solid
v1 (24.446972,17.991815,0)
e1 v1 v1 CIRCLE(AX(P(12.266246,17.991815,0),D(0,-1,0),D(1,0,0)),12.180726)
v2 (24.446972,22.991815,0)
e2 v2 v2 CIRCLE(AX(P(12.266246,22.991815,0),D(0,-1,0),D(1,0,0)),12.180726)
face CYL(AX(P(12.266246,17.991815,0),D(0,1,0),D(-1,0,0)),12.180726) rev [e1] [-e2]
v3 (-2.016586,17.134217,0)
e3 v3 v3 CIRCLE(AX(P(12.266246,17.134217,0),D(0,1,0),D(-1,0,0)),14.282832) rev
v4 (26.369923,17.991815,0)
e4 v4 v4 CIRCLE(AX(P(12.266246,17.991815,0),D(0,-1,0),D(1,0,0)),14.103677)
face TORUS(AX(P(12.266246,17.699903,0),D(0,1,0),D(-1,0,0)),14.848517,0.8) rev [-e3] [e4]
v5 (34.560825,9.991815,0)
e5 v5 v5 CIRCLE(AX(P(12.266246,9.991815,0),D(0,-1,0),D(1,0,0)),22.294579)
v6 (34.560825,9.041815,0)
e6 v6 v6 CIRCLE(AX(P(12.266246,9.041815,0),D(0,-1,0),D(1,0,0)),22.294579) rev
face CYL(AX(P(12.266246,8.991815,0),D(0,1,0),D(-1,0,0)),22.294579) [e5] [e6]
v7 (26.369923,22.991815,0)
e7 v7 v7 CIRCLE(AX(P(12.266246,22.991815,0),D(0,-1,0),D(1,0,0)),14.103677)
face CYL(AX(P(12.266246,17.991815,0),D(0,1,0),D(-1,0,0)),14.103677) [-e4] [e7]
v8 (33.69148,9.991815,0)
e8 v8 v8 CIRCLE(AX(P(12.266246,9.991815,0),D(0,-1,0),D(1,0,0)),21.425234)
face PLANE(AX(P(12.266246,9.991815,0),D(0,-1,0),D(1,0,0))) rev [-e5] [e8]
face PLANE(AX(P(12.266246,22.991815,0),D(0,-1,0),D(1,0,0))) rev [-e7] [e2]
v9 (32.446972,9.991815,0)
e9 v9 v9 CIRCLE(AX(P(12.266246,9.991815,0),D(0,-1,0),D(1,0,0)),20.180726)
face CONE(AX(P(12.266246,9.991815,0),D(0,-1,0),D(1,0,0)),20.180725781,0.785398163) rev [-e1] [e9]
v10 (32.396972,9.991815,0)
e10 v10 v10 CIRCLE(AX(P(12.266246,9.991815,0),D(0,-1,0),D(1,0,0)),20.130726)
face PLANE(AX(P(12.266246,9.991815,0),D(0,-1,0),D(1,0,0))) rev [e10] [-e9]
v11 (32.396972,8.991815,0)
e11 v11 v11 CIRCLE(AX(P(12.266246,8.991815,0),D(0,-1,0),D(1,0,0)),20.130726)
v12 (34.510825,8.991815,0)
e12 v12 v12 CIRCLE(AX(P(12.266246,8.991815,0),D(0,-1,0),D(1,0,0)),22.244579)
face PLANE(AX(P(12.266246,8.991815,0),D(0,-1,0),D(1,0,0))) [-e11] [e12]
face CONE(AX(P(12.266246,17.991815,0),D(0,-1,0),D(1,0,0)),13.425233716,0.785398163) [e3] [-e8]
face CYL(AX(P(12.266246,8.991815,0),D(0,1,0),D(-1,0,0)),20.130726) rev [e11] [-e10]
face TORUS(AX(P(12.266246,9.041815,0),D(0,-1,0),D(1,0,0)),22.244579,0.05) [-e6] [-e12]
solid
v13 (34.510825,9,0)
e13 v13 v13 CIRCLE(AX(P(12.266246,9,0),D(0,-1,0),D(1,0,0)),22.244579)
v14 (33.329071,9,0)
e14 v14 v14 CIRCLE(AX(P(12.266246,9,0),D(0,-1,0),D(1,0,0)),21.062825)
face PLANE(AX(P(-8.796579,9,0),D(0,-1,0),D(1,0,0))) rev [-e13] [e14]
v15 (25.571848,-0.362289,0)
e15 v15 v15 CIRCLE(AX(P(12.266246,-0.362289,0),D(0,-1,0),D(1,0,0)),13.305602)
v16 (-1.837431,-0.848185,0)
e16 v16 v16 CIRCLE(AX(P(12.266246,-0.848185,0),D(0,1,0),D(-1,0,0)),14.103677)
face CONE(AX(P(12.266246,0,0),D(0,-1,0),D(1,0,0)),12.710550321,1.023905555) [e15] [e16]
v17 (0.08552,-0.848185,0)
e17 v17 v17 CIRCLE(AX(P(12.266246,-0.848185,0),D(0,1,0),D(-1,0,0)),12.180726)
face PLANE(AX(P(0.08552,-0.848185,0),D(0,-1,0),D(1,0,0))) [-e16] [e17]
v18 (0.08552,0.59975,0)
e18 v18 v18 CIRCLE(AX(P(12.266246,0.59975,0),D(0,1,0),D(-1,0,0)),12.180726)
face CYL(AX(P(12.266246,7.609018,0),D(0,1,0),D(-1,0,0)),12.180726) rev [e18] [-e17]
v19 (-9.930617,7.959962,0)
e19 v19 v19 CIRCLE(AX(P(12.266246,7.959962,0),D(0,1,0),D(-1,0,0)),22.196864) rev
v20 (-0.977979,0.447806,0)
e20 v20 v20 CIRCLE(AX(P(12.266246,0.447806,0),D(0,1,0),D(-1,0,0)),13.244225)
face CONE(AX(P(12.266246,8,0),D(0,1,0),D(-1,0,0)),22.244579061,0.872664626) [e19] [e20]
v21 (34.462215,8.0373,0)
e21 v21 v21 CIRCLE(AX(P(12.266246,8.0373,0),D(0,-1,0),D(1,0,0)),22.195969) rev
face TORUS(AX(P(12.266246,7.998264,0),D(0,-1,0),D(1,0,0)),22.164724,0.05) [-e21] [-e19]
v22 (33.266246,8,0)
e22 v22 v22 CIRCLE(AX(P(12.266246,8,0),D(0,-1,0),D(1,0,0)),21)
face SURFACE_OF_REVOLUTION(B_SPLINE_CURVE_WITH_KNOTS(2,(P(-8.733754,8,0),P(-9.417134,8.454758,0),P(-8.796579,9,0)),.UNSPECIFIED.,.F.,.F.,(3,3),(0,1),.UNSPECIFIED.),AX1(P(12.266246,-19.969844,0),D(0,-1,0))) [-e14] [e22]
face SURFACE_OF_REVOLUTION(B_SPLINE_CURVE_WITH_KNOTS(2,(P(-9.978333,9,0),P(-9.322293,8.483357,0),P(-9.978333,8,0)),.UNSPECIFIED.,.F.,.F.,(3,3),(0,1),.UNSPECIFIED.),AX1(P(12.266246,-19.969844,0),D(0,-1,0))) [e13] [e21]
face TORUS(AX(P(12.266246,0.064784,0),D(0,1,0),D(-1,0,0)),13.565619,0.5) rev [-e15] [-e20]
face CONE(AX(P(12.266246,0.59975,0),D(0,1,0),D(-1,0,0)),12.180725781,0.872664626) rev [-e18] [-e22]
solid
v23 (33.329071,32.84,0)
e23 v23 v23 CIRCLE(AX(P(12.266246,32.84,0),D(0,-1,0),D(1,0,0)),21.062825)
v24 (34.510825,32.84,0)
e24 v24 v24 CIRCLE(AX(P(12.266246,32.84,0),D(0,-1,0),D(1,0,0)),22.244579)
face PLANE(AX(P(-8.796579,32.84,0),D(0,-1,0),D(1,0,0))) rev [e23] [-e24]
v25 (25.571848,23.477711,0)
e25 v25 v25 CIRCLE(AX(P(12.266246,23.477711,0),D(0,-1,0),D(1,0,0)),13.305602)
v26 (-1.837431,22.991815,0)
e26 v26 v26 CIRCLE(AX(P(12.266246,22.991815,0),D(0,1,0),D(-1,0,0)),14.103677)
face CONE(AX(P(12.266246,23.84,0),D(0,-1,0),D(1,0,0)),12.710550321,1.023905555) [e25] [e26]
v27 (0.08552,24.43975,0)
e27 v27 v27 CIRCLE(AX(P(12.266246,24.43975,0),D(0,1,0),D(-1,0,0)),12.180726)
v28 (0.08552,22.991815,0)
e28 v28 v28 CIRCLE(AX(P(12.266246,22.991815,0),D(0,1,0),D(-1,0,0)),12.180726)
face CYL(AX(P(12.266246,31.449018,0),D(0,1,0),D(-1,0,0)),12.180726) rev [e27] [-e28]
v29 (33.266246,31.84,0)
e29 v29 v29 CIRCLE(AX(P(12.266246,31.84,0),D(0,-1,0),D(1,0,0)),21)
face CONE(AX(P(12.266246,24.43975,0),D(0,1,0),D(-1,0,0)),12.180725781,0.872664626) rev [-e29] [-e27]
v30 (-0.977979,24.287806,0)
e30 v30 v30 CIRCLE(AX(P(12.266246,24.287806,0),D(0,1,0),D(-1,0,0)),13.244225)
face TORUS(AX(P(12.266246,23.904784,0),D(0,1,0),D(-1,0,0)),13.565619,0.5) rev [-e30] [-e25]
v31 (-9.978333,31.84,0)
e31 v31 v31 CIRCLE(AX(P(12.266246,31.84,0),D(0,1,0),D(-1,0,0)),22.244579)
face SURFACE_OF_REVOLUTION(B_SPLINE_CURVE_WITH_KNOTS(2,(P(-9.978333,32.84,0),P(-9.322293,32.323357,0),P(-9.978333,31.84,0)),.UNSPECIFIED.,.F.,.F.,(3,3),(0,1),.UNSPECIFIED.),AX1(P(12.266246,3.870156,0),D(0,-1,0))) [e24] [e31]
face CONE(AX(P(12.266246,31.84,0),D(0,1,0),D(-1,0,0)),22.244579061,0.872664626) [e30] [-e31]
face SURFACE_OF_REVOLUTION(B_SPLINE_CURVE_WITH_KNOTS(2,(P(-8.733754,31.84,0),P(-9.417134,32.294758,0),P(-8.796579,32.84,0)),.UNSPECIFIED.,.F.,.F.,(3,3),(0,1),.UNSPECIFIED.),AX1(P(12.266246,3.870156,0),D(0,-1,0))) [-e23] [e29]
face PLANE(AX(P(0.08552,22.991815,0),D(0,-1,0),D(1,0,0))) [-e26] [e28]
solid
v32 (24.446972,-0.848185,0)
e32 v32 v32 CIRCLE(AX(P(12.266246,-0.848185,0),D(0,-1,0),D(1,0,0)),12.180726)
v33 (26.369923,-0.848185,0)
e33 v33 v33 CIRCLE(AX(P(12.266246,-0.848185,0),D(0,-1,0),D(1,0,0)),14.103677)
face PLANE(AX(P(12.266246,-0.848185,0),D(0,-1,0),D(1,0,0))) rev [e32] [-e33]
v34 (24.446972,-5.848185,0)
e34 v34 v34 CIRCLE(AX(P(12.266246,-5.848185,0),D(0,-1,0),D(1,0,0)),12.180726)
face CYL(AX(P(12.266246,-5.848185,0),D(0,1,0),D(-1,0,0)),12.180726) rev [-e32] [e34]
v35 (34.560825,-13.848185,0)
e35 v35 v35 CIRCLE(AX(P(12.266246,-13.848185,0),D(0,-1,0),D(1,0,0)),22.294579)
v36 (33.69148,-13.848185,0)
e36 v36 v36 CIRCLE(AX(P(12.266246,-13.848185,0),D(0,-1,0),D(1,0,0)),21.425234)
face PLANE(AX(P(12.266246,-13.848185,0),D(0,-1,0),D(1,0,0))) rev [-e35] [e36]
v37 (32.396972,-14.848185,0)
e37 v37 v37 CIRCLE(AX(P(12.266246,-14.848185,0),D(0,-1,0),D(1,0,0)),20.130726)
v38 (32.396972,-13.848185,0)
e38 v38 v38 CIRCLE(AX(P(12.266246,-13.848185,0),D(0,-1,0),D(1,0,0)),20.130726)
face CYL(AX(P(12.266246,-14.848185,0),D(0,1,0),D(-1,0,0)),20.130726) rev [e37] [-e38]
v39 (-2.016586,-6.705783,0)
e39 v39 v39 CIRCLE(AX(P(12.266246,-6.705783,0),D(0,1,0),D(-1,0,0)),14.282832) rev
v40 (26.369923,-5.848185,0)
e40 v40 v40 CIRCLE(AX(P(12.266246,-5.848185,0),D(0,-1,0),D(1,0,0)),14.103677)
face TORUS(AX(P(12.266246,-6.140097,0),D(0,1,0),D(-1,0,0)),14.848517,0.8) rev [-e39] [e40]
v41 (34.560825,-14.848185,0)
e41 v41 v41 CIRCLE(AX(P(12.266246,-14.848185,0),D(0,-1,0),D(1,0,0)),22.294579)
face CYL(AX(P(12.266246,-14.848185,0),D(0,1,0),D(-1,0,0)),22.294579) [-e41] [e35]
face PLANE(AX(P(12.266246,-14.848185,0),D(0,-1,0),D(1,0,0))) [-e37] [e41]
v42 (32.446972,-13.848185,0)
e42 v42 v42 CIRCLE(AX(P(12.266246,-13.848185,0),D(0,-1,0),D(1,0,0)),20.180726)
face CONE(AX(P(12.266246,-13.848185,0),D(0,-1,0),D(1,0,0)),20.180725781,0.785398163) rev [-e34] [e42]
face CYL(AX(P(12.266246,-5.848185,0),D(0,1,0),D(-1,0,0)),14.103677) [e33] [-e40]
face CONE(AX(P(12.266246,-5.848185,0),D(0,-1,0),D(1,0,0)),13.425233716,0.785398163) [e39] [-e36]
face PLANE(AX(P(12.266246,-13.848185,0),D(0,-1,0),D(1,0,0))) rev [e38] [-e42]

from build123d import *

# Parameters (mm, degrees)
ACTIVE_FILLET_R     = 0.5
SKETCH11_R          = 14.103676922
SKETCH11_R_2        = 12.180725781
COLLAR_DEPTH        = 5
PASSIVE_FILLET_R    = 0.8
SKETCH18_R          = 22.294579061
SKETCH18_R_2        = 20.130725781
BOSS_EXTRUDE4_DEPTH = 1
FILLET3_R           = 0.05
FILLET7_R           = 0.05


# Read off the part's stored shape, not the designer's step: Body-Move/Copy2
with BuildPart() as part:
    # Sketch1 → Main Active (revolve)
    with BuildSketch(Plane.XY):
        Polygon((-0.44430417, 0), (-9.978332911, 8), (-8.73375385, 8), (0.085520369, 0.599750256), (0.085520369, -0.848184734), (-1.837430772, -0.848184734), align=None)
    revolve(axis=Axis((12.26624615, 7.609018033, 0), (0, -1, 0)))

    # Active fillet
    active_fillet_edges = [part.edges().sort_by_distance(p)[0] for p in [
        (24.976796471, 0, 0),
    ]]
    fillet(active_fillet_edges, radius=ACTIVE_FILLET_R)

    # Sketch17 → Neck Curve (revolve)
    with BuildSketch(Plane.XY, mode=Mode.PRIVATE) as neck_curve_sk:
        with BuildLine():
            Line((-9.978332911, 8), (-8.73375385, 8))
            add(Edge.make_bspline(
                [(-8.73375385, 8), (-9.417134244, 8.454758025), (-8.796578829, 9)],
                knots=[0, 0, 0, 1, 1, 1], degree=2))
            Line((-8.796578829, 9), (-9.978332911, 9))
            add(Edge.make_bspline(
                [(-9.978332911, 8), (-9.322292514, 8.483356917), (-9.978332911, 9)],
                knots=[0, 0, 0, 1, 1, 1], degree=2))
        make_face()
    revolve(neck_curve_sk.sketch.rotate(Axis((12.26624615, -19.96984433, 0), (0, 1, 0)), 180), axis=Axis((12.26624615, -19.96984433, 0), (0, 1, 0)))

    # Fillet3
    fillet3_edges = [part.edges().sort_by_distance(p)[0] for p in [
        (12.26624615, 8, -22.244579061),
    ]]
    fillet(fillet3_edges, radius=FILLET3_R)


with BuildPart() as body_2:
    # Sketch11 → collar (new body)
    with BuildSketch(Plane.XZ.offset(0.848184734)):
        with Locations((12.26624615, 0)):
            Circle(SKETCH11_R)
        with Locations((12.26624615, 0)):
            Circle(SKETCH11_R_2, mode=Mode.SUBTRACT)
    extrude(amount=COLLAR_DEPTH)

    # Sketch14 → Passive Element (revolve)
    with BuildSketch(Plane.XY, mode=Mode.PRIVATE) as passive_element_sk:
        Polygon((-1.158987566, -5.848184734), (-9.158987566, -13.848184734), (-7.914479631, -13.848184734), (0.085520369, -5.848184734), align=None)
    revolve(passive_element_sk.sketch.rotate(Axis((12.26624615, -19.96984433, 0), (0, 1, 0)), 180), axis=Axis((12.26624615, -19.96984433, 0), (0, 1, 0)))

    # Passive Fillet
    # the kernel refuses this fillet: 0.8 mm, written as the material it adds along each edge
    with BuildSketch(Plane(origin=(12.26624615, -5.848184734, 0), x_dir=(1, 0, 0), z_dir=(0, 0, 1))) as passive_fillet_piece_1:
        with BuildLine():
            CenterArc((14.848517188, -0.291912621), PASSIVE_FILLET_R, 158.599138918, 66.400861082)
            Line((14.282831763, -0.857598046), (14.271518054, -0.868911755))
            Line((14.271518054, -0.868911755), (13.413920008, -0.011313708))
            Line((13.413920008, -0.011313708), (13.425233716, 0.016))
            ThreePointArc((13.425233716, 0.016), (13.764455319, 0.016), (14.088780117, 0.005838252))
            Line((14.088780117, 0.005838252), (14.103676922, 0))
        make_face()
    revolve(axis=Axis((12.26624615, -5.848184734, 0), (0, 1, 0)))

    # Sketch18 → Boss-Extrude4 (add)
    with BuildSketch(Plane.XZ.offset(13.848184734)):
        with Locations((12.26624615, 0)):
            Circle(SKETCH18_R)
        with Locations((12.26624615, 0)):
            Circle(SKETCH18_R_2, mode=Mode.SUBTRACT)
    extrude(amount=BOSS_EXTRUDE4_DEPTH)


with BuildPart() as body_3:
    # Body-Move/Copy2 outline → Body-Move/Copy2 (revolve)
    with BuildSketch(Plane(origin=(12.26624615, 0, 0), x_dir=(1, 0, 0), z_dir=(0, 0, 1))):
        with BuildLine():
            Line((14.103676922, 22.991815266), (13.305602068, 23.477711456))
            ThreePointArc((13.305602068, 23.477711456), (13.067048008, 23.867010025), (13.24422527, 24.287806453))
            Line((13.24422527, 24.287806453), (22.244579061, 31.84))
            add(Edge.make_bspline(
                [(22.244579061, 32.84), (21.588538664, 32.323356917), (22.244579061, 31.84)],
                knots=[0, 0, 0, 1, 1, 1], degree=2))
            Line((22.244579061, 32.84), (21.062824979, 32.84))
            add(Edge.make_bspline(
                [(21.062824979, 32.84), (21.683380394, 32.294758025), (21, 31.84)],
                knots=[0.048181037, 0.048181037, 0.048181037, 1.048181037, 1.048181037, 1.048181037], degree=2))
            Line((21, 31.84), (12.180725781, 24.439750256))
            Line((12.180725781, 24.439750256), (12.180725781, 22.991815266))
            Line((12.180725781, 22.991815266), (14.103676922, 22.991815266))
        make_face()
    revolve(axis=Axis((12.26624615, 0, 0), (0, 1, 0)))


with BuildPart() as body_4:
    # Body-Move_Copy2 2 outline → Body-Move_Copy2 2 (revolve)
    with BuildSketch(Plane(origin=(12.26624615, 0, 0), x_dir=(1, 0, 0), z_dir=(0, 0, 1))):
        with BuildLine():
            Line((14.103676922, 22.991815266), (12.180725781, 22.991815266))
            Line((12.180725781, 22.991815266), (12.180725781, 17.991815266))
            Line((12.180725781, 17.991815266), (20.180725781, 9.991815266))
            Line((20.180725781, 9.991815266), (20.130725781, 9.991815266))
            Line((20.130725781, 9.991815266), (20.130725781, 8.991815266))
            Line((20.130725781, 8.991815266), (22.294579061, 8.991815266))
            Line((22.294579061, 8.991815266), (22.294579061, 9.991815266))
            Line((22.294579061, 9.991815266), (21.425233716, 9.991815266))
            Line((21.425233716, 9.991815266), (14.282831763, 17.134217219))
            ThreePointArc((14.282831763, 17.134217219), (14.065422047, 17.536311687), (14.103676922, 17.991815266))
            Line((14.103676922, 17.991815266), (14.103676922, 22.991815266))
        make_face()
    revolve(axis=Axis((12.26624615, 0, 0), (0, 1, 0)))

    # Fillet7
    fillet7_edges = [body_4.edges().sort_by_distance(p)[0] for p in [
        (-10.028332911, 8.991815266, 0),
    ]]
    fillet(fillet7_edges, radius=FILLET7_R)


solid = Compound([part.part, body_2.part, body_3.part, body_4.part])
